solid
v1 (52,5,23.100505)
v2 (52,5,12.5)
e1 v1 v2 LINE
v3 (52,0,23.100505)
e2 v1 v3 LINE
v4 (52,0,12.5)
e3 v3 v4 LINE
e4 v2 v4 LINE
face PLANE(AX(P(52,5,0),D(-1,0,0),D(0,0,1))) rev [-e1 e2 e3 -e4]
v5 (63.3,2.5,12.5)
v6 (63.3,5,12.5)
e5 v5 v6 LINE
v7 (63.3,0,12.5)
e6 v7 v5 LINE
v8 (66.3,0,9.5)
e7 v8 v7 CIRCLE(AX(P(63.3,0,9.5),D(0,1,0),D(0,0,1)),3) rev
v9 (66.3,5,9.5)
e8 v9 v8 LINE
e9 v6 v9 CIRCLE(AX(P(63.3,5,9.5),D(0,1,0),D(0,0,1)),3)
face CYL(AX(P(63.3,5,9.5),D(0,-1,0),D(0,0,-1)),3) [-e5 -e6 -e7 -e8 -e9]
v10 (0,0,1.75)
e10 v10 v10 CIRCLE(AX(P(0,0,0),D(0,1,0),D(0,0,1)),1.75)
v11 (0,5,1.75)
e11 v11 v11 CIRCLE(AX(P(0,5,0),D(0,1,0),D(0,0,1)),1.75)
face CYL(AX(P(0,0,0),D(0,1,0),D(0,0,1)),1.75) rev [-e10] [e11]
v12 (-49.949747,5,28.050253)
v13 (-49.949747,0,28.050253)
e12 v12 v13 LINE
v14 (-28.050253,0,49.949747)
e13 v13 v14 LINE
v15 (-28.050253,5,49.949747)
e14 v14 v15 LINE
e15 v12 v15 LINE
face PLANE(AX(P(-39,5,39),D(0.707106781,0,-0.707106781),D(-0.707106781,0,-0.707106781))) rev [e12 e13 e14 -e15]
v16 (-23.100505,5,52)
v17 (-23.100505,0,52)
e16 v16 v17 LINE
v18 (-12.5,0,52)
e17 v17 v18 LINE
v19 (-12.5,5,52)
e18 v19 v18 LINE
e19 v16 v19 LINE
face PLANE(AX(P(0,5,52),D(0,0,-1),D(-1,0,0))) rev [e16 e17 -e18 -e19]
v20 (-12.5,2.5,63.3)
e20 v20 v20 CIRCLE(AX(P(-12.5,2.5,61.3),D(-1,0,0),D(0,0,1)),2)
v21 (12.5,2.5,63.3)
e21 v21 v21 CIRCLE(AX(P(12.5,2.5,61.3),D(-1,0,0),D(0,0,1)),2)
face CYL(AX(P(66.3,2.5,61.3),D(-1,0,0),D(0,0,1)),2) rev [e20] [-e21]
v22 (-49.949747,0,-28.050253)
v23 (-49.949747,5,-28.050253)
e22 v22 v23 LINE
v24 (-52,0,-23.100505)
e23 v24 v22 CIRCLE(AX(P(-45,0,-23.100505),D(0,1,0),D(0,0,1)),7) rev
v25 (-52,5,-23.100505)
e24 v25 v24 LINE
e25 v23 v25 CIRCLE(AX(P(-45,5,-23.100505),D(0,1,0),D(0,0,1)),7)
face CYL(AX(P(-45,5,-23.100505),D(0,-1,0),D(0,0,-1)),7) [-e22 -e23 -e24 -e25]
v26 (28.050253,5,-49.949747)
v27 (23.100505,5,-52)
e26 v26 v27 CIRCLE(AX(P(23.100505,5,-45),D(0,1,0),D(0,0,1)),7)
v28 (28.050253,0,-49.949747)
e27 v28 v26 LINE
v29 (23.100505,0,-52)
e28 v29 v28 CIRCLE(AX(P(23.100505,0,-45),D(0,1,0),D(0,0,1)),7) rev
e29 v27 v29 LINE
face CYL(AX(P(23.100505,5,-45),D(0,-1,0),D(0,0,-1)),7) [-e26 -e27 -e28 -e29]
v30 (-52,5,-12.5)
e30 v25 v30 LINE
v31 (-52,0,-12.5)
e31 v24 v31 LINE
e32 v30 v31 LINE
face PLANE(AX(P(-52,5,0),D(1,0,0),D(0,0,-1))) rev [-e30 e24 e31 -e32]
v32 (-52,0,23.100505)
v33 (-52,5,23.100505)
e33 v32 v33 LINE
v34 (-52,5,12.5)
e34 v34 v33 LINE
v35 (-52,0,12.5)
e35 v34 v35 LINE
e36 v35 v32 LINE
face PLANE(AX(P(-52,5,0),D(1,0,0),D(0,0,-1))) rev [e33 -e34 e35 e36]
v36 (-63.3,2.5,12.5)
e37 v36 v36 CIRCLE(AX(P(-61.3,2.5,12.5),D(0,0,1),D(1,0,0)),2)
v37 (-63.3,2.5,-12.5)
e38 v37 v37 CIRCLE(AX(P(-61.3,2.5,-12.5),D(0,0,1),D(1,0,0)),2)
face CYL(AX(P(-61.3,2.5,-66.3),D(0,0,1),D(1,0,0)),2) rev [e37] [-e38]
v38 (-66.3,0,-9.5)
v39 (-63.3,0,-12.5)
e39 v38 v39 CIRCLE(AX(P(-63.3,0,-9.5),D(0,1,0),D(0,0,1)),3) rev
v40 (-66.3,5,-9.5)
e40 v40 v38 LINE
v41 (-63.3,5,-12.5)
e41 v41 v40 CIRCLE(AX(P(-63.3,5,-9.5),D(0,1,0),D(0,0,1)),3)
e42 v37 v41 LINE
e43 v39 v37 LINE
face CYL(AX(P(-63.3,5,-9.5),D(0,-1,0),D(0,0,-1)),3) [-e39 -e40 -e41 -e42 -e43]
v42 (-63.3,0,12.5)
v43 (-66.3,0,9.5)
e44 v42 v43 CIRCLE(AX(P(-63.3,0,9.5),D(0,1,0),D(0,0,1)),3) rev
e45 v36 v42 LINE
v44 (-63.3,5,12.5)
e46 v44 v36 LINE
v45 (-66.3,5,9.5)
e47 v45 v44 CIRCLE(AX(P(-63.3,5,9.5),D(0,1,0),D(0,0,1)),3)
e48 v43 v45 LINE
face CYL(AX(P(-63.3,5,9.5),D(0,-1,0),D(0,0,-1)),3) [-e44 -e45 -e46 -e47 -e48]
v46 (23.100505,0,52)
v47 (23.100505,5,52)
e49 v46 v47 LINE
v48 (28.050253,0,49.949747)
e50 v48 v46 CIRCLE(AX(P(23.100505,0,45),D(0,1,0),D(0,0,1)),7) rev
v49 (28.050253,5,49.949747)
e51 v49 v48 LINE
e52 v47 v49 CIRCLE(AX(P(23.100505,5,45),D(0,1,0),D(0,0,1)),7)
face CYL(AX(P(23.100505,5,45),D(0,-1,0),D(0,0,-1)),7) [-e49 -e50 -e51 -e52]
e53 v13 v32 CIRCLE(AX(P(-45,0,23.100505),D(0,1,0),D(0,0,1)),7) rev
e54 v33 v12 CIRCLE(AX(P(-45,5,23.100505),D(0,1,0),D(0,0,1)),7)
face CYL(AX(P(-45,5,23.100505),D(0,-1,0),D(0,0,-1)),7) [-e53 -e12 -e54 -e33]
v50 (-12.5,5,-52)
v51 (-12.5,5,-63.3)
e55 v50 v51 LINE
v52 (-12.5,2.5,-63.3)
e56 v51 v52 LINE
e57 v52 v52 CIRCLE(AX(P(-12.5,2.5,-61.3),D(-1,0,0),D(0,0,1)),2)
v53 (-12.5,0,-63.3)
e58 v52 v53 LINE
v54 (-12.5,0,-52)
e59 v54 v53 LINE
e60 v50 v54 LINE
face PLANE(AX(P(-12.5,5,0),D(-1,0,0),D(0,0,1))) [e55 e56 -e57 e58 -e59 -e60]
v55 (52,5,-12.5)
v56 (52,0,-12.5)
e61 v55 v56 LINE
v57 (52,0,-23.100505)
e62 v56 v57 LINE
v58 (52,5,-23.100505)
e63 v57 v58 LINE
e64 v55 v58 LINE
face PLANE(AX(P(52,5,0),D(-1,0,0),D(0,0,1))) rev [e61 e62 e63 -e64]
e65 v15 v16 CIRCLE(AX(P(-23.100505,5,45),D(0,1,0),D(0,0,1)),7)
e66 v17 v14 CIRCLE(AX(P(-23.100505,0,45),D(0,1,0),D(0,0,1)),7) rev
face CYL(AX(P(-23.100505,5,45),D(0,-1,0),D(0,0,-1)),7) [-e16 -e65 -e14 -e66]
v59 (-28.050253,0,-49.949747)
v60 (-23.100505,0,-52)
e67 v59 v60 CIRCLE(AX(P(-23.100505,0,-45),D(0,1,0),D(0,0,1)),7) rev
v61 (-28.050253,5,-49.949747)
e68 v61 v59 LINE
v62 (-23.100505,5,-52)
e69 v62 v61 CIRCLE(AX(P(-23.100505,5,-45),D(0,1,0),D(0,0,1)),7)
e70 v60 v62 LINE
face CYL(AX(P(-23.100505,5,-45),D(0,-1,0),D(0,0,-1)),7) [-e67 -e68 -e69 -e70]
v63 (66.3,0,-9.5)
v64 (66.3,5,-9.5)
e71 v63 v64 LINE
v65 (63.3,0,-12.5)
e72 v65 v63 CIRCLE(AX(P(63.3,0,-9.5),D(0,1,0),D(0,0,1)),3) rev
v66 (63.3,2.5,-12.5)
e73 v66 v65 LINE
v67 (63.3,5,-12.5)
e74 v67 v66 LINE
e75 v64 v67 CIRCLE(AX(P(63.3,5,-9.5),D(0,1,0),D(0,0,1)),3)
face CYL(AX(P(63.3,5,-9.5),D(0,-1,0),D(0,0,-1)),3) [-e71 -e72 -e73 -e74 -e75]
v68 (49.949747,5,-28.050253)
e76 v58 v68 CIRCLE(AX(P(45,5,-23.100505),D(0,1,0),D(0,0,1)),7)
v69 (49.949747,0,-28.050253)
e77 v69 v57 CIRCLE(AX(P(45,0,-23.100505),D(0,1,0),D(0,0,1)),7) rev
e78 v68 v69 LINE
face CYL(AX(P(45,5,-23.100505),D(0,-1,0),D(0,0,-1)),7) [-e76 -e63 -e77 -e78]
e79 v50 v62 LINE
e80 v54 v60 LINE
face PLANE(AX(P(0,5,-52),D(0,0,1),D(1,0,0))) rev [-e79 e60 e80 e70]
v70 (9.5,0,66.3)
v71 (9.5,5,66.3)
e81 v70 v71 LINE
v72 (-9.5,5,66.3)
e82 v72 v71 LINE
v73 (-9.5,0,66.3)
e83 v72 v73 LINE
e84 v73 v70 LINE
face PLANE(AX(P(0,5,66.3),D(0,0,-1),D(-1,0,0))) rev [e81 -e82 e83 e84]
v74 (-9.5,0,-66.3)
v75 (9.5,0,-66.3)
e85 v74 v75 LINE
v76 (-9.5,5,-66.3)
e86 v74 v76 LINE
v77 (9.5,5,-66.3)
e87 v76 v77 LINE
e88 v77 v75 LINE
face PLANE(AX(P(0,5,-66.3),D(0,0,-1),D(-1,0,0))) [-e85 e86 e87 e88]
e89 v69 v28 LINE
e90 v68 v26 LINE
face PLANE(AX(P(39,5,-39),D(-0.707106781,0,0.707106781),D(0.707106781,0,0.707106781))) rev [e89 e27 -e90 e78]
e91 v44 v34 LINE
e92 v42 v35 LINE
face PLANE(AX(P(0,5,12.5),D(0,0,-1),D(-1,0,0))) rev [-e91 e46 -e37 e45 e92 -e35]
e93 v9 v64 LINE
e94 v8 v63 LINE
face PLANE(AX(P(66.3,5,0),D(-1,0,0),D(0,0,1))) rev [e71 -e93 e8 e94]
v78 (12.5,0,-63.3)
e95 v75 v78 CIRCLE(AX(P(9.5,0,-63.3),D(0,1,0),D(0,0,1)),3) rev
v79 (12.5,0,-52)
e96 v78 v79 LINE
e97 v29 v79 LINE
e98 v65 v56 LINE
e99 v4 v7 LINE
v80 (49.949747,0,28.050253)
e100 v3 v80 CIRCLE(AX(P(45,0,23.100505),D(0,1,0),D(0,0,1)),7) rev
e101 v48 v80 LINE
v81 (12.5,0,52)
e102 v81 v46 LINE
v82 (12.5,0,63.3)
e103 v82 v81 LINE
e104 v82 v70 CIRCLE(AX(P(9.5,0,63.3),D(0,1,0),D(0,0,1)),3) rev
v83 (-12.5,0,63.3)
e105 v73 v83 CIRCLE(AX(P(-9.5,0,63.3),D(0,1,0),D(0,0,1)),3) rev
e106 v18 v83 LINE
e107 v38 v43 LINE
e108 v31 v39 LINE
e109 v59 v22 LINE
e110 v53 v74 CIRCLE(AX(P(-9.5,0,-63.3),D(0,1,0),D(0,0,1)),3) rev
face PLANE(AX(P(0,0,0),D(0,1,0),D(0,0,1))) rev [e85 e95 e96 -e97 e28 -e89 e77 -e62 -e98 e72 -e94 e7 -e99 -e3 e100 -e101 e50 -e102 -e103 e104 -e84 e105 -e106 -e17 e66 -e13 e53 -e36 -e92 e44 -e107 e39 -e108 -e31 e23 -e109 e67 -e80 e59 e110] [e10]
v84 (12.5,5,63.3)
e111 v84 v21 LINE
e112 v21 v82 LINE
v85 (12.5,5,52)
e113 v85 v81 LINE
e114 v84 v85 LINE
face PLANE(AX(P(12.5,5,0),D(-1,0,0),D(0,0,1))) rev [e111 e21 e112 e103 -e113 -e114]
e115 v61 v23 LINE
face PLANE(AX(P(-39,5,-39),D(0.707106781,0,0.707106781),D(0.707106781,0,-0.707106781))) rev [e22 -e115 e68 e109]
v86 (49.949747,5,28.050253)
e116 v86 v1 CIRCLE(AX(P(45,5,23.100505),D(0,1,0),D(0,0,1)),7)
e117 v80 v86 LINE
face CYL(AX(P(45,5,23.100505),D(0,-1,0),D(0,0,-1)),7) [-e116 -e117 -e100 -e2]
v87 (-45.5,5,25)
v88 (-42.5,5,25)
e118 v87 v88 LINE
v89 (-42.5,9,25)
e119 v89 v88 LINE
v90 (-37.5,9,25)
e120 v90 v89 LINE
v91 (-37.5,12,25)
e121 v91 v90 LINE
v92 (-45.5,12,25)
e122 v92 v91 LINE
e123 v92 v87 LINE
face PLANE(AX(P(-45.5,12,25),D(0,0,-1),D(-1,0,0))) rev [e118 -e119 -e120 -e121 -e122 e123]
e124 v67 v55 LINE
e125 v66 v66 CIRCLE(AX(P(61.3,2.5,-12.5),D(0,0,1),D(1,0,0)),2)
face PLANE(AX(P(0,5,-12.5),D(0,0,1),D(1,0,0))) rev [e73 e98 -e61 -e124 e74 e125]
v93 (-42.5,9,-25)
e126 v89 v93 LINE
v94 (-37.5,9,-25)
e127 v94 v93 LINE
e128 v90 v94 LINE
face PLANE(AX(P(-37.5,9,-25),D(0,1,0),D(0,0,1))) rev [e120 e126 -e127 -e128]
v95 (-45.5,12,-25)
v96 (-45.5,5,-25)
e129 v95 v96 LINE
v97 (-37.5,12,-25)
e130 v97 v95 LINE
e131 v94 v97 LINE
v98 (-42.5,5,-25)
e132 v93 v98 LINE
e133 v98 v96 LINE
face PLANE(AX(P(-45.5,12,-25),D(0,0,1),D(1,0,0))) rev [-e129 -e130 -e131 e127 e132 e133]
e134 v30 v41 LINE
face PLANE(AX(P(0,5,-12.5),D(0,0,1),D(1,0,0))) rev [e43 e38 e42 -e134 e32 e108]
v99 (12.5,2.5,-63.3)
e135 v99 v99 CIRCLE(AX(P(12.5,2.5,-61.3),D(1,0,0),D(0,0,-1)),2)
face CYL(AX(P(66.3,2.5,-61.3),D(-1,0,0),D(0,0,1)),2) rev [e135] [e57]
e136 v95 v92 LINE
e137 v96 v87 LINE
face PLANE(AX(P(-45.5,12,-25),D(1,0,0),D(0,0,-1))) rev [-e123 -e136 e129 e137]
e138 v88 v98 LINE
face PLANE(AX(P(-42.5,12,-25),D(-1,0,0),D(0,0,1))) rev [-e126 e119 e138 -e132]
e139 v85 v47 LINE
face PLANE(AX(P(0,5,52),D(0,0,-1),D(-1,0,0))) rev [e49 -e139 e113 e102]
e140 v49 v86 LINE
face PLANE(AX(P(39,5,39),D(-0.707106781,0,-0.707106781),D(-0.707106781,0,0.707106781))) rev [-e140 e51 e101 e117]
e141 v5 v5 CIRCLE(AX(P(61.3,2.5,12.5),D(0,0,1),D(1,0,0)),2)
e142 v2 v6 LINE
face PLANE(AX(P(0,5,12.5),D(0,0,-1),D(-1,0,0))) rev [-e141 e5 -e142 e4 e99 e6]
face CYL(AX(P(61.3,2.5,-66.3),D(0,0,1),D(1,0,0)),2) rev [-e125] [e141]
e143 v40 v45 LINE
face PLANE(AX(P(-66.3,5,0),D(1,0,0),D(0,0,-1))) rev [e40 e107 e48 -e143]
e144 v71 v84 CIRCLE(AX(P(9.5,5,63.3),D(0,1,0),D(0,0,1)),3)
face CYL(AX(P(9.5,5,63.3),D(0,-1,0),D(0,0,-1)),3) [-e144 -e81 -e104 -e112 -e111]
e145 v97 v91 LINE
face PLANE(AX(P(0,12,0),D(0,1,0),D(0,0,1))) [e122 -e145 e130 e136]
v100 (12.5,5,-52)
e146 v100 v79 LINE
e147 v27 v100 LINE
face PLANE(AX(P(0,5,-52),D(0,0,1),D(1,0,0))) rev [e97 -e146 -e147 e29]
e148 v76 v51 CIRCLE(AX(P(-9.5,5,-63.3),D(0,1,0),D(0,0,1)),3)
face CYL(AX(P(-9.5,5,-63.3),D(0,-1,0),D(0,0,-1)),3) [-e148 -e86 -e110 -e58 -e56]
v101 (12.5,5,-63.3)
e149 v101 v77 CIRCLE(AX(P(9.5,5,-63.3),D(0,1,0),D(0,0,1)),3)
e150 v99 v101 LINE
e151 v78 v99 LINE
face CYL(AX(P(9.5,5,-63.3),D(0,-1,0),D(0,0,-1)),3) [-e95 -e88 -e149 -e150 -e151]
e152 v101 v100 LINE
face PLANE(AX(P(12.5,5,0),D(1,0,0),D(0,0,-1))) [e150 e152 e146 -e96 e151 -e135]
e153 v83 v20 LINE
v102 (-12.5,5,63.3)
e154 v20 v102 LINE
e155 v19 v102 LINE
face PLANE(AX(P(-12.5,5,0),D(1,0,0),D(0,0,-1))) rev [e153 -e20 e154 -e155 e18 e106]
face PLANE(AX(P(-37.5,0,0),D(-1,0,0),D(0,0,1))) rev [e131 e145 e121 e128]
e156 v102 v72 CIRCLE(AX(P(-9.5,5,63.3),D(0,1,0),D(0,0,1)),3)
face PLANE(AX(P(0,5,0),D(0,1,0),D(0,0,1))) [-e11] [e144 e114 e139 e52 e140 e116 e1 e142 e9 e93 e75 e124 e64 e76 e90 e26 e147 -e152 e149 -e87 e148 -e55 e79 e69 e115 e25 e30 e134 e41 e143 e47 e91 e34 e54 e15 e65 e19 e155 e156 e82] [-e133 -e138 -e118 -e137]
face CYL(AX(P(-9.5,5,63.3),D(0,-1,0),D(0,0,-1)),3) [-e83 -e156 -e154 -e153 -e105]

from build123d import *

# Parameters (mm, degrees)
SKETCH_1_W          = 14.3
SKETCH_1_H          = 25
SKETCH_1_W_2        = 25
SKETCH_1_H_2        = 14.3
EXTRUDE_1_DEPTH     = 5
FILLET_1_R          = 3
FILLET_2_R          = 7
FILLET_3_R          = 23
EXTRUDE_START       = -5
EXTRUDE_2_DEPTH     = 5
SKETCH_7_R          = 1.75
CUT_EXTRUDE_5_DEPTH = 94.895580301
SKETCH_9_W          = 3
SKETCH_9_H          = 50
EXTRUDE_3_DEPTH     = 7
SKETCH_10_W         = 50
SKETCH_10_H         = 3
EXTRUDE_4_DEPTH     = 5
SKETCH_11_R         = 2
CUT_EXTRUDE_6_DEPTH = 104.678011169
SKETCH_12_R         = 2
CUT_EXTRUDE_7_DEPTH = 104.678011169


with BuildPart() as part:
    # 스케치1 → 보스-돌출1 (new body)
    with BuildSketch(Plane(origin=(0, 0, 0), x_dir=(1, 0, 0), z_dir=(0, 1, 0))):
        Polygon((-26, 52), (-39, 39), (-26, 39), (26, 39), (39, 39), (26, 52), (12.5, 52), (-12.5, 52), align=None)
        Polygon((-26, 39), (-39, 39), (-39, 26), align=None)
        Polygon((-39, 26), (-39, 39), (-52, 26), (-52, 12.5), (-52, -12.5), (-52, -26), (-39, -39), (-39, -26), align=None)
        with Locations((-59.15, 0)):
            Rectangle(SKETCH_1_W, SKETCH_1_H)
        with Locations((0, 59.15)):
            Rectangle(SKETCH_1_W_2, SKETCH_1_H_2)
        Polygon((39, 39), (26, 39), (39, 26), align=None)
        Polygon((52, 26), (39, 39), (39, 26), (39, -26), (39, -39), (52, -26), (52, -12.5), (52, 12.5), align=None)
        with Locations((59.15, 0)):
            Rectangle(SKETCH_1_W, SKETCH_1_H)
        Polygon((39, -39), (39, -26), (26, -39), align=None)
        Polygon((-26, -39), (-39, -39), (-26, -52), (-12.5, -52), (12.5, -52), (26, -52), (39, -39), (26, -39), align=None)
        Polygon((-26, -39), (-39, -26), (-39, -39), align=None)
        with Locations((0, -59.15)):
            Rectangle(SKETCH_1_W_2, SKETCH_1_H_2)
    extrude(amount=EXTRUDE_1_DEPTH)

    # 필렛1
    fillet_1_edges = [part.edges().sort_by_distance(p)[0] for p in [
        (12.5, 2.5, 66.3),
        (-12.5, 2.5, 66.3),
        (-66.3, 2.5, 12.5),
        (-66.3, 2.5, -12.5),
        (-12.5, 2.5, -66.3),
        (12.5, 2.5, -66.3),
        (66.3, 2.5, -12.5),
        (66.3, 2.5, 12.5),
    ]]
    fillet(fillet_1_edges, radius=FILLET_1_R)

    # 필렛2
    fillet_2_edges = [part.edges().sort_by_distance(p)[0] for p in [
        (-26, 2.5, 52),
        (-52, 2.5, 26),
        (-52, 2.5, -26),
        (-26, 2.5, -52),
        (26, 2.5, -52),
        (52, 2.5, -26),
        (52, 2.5, 26),
        (26, 2.5, 52),
    ]]
    fillet(fillet_2_edges, radius=FILLET_2_R)

    # 필렛3
    # the kernel refuses this fillet: 23 mm, written as the material it adds along each edge
    with BuildSketch(Plane(origin=(-39, 0, 26), x_dir=(0, 0, -1), z_dir=(0, 1, 0))) as fillet_3_piece_1:
        with BuildLine():
            CenterArc((FILLET_3_R * 0.414213562373, -FILLET_3_R), FILLET_3_R, 90, 45)
            Line((-FILLET_3_R * 0.292893218813, -FILLET_3_R * 0.292893218813), (0, 0))
            Line((0, 0), (FILLET_3_R * 0.414213562373, 0))
        make_face()
    extrude(amount=5)
    with BuildSketch(Plane(origin=(-26, 0, 39), x_dir=(1, 0, 0), z_dir=(0, 1, 0)), Plane(origin=(26, 0, 39), x_dir=(0.7071067811865479, 0, -0.7071067811865471), z_dir=(0, 1, 0)), Plane(origin=(39, 0, 26), x_dir=(0, 0, -1), z_dir=(0, 1, 0)), Plane(origin=(39, 0, -26), x_dir=(-0.7071067811865476, 0, -0.7071067811865476), z_dir=(0, 1, 0)), Plane(origin=(26, 0, -39), x_dir=(-1, 0, 0), z_dir=(0, 1, 0)), Plane(origin=(-26, 0, -39), x_dir=(-0.7071067811865471, 0, 0.7071067811865479), z_dir=(0, 1, 0)), Plane(origin=(-39, 0, -26), x_dir=(0, 0, 1), z_dir=(0, 1, 0))) as fillet_3_piece_2:
        with BuildLine():
            CenterArc((FILLET_3_R * 0.414213562373, FILLET_3_R), FILLET_3_R, 225, 45)
            Line((-FILLET_3_R * 0.292893218813, FILLET_3_R * 0.292893218813), (0, 0))
            Line((0, 0), (FILLET_3_R * 0.414213562373, 0))
        make_face()
    extrude(amount=5)

    # 스케치6 → 보스-돌출2 (add)
    with BuildSketch(Plane(origin=(0, 5, 0), x_dir=(1, 0, 0), z_dir=(0, 1, 0)).offset(EXTRUDE_START)):
        with BuildLine():
            Line((16.473088065, 39), (-16.473088065, 39))
            ThreePointArc((-16.473088065, 39), (-25.120040329, 37.312677367), (-32.4982797, 32.4982797))
            ThreePointArc((-32.4982797, 32.4982797), (-37.312677367, 25.120040329), (-39, 16.473088065))
            Line((-39, 16.473088065), (-39, -16.473088065))
            ThreePointArc((-39, -16.473088065), (-37.312677367, -25.120040329), (-32.4982797, -32.4982797))
            ThreePointArc((-32.4982797, -32.4982797), (-25.120040329, -37.312677367), (-16.473088065, -39))
            Line((-16.473088065, -39), (16.473088065, -39))
            ThreePointArc((16.473088065, -39), (25.120040329, -37.312677367), (32.4982797, -32.4982797))
            ThreePointArc((32.4982797, -32.4982797), (37.312677367, -25.120040329), (39, -16.473088065))
            Line((39, -16.473088065), (39, 16.473088065))
            ThreePointArc((39, 16.473088065), (37.312677367, 25.120040329), (32.4982797, 32.4982797))
            ThreePointArc((32.4982797, 32.4982797), (25.120040329, 37.312677367), (16.473088065, 39))
        make_face()
    extrude(amount=EXTRUDE_2_DEPTH)

    # 스케치7 → 컷-돌출5 (cut, through all)
    with BuildSketch(Plane(origin=(0, 5, 0), x_dir=(1, 0, 0), z_dir=(0, 1, 0))):
        with Locations(Location((0, 0, 0), (0, 0, 270))):
            Circle(SKETCH_7_R)
    extrude(amount=-CUT_EXTRUDE_5_DEPTH, mode=Mode.SUBTRACT)

    # 스케치9 → 보스-돌출3 (add)
    with BuildSketch(Plane(origin=(0, 5, 0), x_dir=(1, 0, 0), z_dir=(0, 1, 0))):
        with Locations((-44, 0)):
            Rectangle(SKETCH_9_W, SKETCH_9_H)
    extrude(amount=EXTRUDE_3_DEPTH)

    # 스케치10 → 보스-돌출4 (add)
    with BuildSketch(Plane(origin=(-42.5, 0, 0), x_dir=(0, 0, -1), z_dir=(1, 0, 0))):
        with Locations((0, 10.5)):
            Rectangle(SKETCH_10_W, SKETCH_10_H)
    extrude(amount=EXTRUDE_4_DEPTH)

    # 스케치11 → 컷-돌출6 (cut, through all)
    with BuildSketch(Plane.XY.offset(12.5)):
        with Locations(Location((-61.3, 2.5, 0), (0, 0, 180))):
            Circle(SKETCH_11_R)
        with Locations((61.3, 2.5)):
            Circle(SKETCH_11_R)
    extrude(amount=-CUT_EXTRUDE_6_DEPTH, mode=Mode.SUBTRACT)

    # 스케치12 → 컷-돌출7 (cut, through all)
    with BuildSketch(Plane.ZY.offset(12.5)):
        with Locations(Location((-61.3, 2.5, 0), (0, 0, 180))):
            Circle(SKETCH_12_R)
        with Locations((61.3, 2.5)):
            Circle(SKETCH_12_R)
    extrude(amount=-CUT_EXTRUDE_7_DEPTH, mode=Mode.SUBTRACT)


solid = part.part
